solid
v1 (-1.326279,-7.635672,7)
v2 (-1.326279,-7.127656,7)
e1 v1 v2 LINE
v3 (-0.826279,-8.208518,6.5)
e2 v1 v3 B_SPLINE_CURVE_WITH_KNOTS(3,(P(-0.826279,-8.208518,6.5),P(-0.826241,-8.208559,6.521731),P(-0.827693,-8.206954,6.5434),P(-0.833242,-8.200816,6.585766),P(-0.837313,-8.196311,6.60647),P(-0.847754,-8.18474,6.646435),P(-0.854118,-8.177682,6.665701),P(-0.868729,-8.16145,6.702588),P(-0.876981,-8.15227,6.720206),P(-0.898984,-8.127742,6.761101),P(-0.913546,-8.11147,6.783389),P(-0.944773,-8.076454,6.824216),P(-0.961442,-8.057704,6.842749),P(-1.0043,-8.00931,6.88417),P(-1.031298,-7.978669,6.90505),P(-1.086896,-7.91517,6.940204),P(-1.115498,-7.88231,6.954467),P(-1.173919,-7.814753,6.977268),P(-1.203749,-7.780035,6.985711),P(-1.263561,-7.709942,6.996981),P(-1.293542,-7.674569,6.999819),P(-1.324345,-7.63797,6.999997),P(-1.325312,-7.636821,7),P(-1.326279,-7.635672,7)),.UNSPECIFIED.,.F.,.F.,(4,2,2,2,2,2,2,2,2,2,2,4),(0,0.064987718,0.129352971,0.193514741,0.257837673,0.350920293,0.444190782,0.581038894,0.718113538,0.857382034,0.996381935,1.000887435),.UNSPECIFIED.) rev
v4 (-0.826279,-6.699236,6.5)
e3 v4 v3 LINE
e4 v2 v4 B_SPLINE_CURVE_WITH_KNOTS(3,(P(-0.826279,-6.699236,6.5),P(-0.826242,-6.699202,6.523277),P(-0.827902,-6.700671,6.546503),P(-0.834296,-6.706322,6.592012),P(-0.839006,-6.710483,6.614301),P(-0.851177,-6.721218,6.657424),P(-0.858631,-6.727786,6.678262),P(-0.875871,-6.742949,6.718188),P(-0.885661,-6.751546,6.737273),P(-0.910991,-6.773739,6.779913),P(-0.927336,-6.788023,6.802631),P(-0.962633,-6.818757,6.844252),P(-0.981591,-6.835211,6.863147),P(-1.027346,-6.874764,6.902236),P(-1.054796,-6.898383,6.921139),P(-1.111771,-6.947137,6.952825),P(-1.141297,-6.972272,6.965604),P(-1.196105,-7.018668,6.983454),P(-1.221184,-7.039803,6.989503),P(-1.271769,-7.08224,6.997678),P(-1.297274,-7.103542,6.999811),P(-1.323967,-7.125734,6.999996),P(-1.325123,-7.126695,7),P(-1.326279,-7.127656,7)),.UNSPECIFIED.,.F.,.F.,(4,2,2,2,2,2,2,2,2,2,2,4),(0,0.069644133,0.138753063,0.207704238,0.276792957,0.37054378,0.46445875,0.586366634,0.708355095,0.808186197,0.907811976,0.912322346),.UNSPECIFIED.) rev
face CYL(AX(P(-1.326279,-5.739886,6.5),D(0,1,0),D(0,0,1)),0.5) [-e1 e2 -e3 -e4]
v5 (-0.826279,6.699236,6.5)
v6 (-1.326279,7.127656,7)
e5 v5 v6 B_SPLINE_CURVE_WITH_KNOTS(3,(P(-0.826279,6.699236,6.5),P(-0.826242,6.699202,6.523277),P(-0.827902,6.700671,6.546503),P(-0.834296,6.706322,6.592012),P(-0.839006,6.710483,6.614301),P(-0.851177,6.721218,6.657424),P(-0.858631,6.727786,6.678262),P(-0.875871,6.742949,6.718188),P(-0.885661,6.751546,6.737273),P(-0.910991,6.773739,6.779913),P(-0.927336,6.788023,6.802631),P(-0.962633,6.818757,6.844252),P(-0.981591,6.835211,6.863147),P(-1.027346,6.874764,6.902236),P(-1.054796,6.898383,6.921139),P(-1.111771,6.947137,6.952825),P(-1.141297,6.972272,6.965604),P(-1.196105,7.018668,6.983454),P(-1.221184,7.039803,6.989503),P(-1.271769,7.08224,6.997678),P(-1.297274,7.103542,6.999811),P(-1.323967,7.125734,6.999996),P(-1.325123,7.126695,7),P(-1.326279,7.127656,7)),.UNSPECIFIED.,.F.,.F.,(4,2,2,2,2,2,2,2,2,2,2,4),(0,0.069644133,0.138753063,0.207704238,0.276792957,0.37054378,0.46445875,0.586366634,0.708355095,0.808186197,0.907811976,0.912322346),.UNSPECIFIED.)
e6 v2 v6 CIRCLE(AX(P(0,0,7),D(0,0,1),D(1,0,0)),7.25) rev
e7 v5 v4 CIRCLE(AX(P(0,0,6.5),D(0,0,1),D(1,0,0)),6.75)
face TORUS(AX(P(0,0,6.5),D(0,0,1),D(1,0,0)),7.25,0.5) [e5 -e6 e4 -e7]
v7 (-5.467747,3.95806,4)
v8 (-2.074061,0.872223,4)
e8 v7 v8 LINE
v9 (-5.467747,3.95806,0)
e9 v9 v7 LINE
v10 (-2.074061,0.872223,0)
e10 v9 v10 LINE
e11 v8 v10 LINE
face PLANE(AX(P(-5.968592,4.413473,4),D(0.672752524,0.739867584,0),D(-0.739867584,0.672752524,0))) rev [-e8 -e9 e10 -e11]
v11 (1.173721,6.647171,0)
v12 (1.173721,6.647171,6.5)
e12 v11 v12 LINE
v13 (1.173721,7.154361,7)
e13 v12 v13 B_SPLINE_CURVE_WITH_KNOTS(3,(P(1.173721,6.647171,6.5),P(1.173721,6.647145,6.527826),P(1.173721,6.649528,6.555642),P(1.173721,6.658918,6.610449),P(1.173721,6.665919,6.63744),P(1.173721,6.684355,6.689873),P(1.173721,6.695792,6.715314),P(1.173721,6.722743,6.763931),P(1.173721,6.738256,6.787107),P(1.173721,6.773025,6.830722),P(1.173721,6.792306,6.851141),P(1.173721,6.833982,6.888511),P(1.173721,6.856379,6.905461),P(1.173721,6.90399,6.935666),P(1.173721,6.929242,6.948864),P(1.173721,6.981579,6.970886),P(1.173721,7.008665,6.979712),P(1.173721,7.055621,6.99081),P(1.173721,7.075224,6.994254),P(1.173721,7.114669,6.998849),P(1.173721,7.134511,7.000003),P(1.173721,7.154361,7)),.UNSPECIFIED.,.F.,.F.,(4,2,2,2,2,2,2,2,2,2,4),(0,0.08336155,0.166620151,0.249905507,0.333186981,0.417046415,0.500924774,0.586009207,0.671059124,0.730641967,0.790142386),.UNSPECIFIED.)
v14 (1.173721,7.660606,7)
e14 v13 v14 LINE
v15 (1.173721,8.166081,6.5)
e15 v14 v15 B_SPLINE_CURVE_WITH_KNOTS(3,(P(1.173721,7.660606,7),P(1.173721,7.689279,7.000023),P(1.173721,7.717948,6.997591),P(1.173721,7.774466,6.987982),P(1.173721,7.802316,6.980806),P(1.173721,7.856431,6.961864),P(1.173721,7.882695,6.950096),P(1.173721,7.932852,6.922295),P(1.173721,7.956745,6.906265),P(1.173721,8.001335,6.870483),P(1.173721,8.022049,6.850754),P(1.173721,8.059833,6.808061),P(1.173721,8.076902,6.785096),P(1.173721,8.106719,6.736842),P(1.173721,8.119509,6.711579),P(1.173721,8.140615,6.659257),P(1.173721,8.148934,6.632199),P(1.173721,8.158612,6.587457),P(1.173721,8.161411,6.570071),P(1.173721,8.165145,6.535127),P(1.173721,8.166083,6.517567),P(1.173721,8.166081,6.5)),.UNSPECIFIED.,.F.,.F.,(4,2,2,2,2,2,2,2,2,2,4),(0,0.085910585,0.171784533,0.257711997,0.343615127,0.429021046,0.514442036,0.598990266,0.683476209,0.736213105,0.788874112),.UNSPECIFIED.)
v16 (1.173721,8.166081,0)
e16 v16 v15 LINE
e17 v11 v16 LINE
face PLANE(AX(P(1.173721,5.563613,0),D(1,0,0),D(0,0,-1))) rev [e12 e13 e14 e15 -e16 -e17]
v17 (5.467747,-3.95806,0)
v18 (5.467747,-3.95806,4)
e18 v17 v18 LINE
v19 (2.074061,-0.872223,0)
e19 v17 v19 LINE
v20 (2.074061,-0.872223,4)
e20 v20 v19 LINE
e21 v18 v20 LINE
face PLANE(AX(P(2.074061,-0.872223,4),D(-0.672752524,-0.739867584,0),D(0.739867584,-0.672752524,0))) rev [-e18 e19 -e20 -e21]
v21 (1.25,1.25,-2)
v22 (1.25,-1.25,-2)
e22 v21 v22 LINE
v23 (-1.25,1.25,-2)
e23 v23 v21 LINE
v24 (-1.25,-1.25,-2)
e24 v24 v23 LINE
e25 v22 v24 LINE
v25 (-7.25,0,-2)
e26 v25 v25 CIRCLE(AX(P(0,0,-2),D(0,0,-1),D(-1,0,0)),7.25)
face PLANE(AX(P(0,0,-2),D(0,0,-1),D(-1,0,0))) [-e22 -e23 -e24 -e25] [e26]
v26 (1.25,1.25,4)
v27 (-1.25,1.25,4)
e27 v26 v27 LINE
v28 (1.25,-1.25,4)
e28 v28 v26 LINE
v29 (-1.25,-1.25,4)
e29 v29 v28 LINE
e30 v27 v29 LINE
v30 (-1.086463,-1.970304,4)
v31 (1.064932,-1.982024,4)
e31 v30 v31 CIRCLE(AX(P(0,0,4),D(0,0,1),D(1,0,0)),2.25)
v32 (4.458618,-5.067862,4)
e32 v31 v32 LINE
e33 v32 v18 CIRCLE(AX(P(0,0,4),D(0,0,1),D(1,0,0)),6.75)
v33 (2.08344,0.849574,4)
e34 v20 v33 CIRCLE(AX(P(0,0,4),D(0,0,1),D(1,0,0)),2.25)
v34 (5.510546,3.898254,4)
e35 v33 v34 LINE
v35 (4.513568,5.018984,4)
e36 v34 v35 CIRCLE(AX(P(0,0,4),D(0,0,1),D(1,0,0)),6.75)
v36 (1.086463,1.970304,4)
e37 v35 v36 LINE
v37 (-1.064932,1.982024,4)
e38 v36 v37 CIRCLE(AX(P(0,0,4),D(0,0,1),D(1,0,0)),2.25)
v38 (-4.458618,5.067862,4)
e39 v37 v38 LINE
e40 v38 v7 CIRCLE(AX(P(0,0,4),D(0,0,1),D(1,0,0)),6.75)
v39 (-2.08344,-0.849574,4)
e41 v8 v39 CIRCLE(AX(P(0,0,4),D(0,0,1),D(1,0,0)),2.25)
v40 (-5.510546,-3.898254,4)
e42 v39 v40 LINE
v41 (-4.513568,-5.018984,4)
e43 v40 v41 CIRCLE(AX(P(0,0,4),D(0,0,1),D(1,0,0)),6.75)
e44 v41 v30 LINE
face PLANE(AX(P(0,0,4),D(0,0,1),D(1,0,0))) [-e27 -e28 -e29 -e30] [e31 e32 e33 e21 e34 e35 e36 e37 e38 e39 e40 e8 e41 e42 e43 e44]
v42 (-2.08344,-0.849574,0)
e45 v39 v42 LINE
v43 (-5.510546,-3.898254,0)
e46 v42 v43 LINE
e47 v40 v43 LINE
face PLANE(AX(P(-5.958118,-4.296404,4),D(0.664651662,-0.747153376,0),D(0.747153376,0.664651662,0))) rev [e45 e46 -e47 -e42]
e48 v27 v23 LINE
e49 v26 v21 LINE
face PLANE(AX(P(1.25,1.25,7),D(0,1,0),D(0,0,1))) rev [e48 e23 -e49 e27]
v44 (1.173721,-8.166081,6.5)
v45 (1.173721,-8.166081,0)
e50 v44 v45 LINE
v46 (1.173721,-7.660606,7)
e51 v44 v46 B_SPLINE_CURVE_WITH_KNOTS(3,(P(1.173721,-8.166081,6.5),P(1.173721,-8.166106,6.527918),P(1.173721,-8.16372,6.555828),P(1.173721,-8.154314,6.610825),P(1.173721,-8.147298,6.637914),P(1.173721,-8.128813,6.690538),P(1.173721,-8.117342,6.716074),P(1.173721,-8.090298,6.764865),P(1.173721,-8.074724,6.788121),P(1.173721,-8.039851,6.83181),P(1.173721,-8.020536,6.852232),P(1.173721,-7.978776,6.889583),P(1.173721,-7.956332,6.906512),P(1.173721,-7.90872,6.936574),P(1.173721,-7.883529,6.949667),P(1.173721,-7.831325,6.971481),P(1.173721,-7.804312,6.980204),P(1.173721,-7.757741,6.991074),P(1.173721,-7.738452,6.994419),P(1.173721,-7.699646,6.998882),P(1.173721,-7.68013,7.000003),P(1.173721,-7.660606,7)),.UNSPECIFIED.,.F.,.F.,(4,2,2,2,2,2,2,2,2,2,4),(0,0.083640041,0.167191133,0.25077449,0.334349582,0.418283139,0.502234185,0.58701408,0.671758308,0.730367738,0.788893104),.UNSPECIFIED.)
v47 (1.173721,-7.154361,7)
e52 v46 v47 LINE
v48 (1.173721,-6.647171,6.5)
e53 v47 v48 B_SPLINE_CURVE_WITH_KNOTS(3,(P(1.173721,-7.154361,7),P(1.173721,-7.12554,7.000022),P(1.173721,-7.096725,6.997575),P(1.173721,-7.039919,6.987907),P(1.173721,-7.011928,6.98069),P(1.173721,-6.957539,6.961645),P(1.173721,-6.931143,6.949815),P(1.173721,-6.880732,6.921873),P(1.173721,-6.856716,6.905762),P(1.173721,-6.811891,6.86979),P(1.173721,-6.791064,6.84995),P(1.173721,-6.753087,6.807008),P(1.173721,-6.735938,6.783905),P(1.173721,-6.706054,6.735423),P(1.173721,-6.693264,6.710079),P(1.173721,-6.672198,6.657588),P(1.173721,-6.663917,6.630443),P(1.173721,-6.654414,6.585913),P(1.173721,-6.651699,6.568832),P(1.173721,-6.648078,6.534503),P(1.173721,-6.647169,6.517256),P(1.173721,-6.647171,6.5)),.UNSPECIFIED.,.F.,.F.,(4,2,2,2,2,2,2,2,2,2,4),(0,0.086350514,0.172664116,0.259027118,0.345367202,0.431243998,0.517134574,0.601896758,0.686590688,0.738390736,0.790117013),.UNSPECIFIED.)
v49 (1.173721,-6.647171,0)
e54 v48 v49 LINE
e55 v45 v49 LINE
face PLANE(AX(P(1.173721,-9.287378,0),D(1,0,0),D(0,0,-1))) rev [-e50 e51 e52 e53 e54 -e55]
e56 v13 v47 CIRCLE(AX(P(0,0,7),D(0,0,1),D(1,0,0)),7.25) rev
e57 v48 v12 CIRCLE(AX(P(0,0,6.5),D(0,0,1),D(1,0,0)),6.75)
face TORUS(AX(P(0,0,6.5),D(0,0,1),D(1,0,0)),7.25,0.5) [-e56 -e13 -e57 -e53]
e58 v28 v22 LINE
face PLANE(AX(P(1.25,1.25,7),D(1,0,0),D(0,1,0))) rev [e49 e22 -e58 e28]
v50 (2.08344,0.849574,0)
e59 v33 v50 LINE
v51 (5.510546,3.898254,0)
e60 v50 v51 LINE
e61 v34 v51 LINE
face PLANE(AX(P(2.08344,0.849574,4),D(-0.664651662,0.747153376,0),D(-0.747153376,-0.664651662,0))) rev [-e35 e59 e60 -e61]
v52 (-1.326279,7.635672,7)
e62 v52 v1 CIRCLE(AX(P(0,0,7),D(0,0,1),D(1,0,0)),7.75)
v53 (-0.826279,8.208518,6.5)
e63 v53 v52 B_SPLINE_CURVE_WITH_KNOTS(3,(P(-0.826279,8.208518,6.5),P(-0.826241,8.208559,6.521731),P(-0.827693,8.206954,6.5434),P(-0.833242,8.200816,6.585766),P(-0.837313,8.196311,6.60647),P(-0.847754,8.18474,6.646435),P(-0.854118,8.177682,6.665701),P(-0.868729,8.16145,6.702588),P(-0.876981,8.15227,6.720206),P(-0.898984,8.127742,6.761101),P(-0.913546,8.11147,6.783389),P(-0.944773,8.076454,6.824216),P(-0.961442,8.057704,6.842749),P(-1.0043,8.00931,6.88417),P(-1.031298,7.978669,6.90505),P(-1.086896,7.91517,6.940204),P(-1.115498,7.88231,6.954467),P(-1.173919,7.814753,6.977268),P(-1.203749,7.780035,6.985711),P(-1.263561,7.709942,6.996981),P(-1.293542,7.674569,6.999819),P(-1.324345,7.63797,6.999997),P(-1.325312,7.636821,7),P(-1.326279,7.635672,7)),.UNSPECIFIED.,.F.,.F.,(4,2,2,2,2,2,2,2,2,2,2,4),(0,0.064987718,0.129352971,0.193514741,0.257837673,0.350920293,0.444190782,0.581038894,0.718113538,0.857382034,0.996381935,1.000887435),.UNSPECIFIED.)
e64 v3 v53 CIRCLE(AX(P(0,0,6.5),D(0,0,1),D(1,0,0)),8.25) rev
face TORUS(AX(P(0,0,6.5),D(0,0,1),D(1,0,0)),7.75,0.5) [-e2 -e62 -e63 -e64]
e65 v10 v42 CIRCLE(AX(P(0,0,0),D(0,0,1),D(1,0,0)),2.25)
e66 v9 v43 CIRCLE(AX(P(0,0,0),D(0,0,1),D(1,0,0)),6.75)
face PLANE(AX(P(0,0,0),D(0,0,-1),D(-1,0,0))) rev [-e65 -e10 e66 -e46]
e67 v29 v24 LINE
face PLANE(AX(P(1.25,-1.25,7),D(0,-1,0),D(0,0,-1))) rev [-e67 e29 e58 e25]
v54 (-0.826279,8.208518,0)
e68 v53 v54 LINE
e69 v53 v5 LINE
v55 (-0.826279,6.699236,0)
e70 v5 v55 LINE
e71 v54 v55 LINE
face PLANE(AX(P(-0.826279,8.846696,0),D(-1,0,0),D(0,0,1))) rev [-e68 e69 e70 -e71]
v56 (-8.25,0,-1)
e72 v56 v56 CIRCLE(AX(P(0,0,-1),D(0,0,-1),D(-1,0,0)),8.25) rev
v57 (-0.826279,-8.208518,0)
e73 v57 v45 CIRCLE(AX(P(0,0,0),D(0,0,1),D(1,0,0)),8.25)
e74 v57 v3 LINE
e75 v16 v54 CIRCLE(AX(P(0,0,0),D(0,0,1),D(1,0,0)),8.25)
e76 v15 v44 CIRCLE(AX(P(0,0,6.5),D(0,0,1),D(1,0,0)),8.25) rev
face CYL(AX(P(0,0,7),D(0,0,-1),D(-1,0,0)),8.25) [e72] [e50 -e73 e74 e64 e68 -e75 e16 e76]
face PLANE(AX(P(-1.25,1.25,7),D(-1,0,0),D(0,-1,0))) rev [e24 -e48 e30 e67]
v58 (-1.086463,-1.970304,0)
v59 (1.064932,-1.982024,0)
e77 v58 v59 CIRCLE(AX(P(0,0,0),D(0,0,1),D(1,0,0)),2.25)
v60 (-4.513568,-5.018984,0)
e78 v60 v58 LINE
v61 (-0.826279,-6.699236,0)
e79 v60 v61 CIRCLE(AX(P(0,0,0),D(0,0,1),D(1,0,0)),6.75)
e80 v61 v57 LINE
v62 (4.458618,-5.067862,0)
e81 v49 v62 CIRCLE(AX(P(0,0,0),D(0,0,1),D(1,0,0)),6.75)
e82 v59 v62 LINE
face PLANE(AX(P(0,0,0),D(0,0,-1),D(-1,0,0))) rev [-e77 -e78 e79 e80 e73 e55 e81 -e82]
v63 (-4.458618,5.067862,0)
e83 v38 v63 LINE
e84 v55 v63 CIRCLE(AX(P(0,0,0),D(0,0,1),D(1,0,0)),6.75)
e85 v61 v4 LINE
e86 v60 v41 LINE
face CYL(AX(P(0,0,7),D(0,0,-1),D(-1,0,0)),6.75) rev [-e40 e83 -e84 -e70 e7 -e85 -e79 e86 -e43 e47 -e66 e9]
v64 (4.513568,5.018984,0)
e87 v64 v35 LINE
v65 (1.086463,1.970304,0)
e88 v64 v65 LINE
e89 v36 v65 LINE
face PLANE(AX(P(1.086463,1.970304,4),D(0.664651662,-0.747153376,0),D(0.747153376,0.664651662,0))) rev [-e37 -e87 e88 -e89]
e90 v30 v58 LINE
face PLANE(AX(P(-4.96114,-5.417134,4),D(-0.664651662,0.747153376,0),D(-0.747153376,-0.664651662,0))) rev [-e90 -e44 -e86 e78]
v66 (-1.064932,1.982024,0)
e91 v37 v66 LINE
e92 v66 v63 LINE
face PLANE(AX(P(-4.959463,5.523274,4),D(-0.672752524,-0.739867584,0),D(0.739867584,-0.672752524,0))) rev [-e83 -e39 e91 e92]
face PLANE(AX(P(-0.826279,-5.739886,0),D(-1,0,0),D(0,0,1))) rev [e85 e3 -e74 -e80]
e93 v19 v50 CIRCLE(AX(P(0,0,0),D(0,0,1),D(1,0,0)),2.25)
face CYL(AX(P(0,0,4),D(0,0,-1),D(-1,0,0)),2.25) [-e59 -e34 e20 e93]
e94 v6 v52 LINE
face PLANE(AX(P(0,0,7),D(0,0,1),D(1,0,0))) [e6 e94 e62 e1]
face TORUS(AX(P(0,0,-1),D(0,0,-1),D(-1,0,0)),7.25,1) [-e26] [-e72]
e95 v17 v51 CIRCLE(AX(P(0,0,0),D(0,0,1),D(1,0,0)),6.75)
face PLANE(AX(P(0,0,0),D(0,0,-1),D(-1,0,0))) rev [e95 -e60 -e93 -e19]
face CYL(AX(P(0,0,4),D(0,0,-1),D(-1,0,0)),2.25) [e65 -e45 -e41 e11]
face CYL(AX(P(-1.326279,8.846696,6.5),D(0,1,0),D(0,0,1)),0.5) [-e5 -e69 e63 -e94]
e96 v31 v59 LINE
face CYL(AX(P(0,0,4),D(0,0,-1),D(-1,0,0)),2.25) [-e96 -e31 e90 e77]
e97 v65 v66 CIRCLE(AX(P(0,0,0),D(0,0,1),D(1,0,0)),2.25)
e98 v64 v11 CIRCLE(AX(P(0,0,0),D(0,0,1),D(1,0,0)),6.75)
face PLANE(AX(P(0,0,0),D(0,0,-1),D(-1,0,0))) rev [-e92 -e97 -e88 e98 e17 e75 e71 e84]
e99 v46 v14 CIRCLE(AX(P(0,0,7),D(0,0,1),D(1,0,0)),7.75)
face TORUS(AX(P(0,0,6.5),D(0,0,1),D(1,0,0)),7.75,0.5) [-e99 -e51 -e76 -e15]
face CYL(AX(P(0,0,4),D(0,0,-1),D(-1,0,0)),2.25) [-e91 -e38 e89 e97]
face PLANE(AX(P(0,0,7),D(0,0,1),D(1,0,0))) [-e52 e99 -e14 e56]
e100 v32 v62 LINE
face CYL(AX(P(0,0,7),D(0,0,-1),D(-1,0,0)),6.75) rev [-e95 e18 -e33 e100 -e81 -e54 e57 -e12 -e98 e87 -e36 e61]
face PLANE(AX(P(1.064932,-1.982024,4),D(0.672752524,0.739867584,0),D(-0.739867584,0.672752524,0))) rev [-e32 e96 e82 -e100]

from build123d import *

# Parameters (mm, degrees)
SKETCH_1_R          = 8.25
SKETCH_1_R_2        = 6.75
EXTRUDE_1_DEPTH     = 7
EXTRUDE_START       = 2
SKETCH_2_R          = 8.25
EXTRUDE_1_2_DEPTH   = 2
EXTRUDE_3_DEPTH     = 4
SKETCH_3_W          = 2.5
SKETCH_3_H          = 2.5
CUT_EXTRUDE_1_DEPTH = 15.735162028
SKETCH_6_W          = 2
SKETCH_6_H          = 3.283082556
SKETCH_6_H_2        = 3.547491889
CUT_EXTRUDE_2_DEPTH = 7
FILLET_1_R          = 1
FILLET_2_R          = 0.5


with BuildPart() as part:
    # Эскиз1 → Extrude 1 (new body)
    with BuildSketch(Plane.XY):
        Circle(SKETCH_1_R)
        Circle(SKETCH_1_R_2, mode=Mode.SUBTRACT)
    extrude(amount=EXTRUDE_1_DEPTH)

    # Эскиз2 → Extrude 1 2 (add)
    with BuildSketch(Plane(origin=(0, 0, 0), x_dir=(-1, 0, 0), z_dir=(0, 0, -1)).offset(EXTRUDE_START)):
        Circle(SKETCH_2_R)
    extrude(amount=-EXTRUDE_1_2_DEPTH)

    # Эскиз4 → Бобышка-Вытянуть3 (add)
    with BuildSketch(Plane.XY):
        with BuildLine():
            Line((2.07406055, -0.872222927), (5.968591922, -4.413472559))
            Line((5.968591922, -4.413472559), (4.959463137, -5.523273935))
            Line((4.959463137, -5.523273935), (1.064931765, -1.982024303))
            ThreePointArc((1.064931765, -1.982024303), (-0.012257169, -2.249966613), (-1.08646291, -1.970304125))
            Line((-1.08646291, -1.970304125), (-4.961140395, -5.41713434))
            Line((-4.961140395, -5.41713434), (-5.958117889, -4.296404276))
            Line((-5.958117889, -4.296404276), (-2.083440404, -0.849574061))
            ThreePointArc((-2.083440404, -0.849574061), (-2.249966613, 0.012257169), (-2.07406055, 0.872222927))
            Line((-2.07406055, 0.872222927), (-5.968591922, 4.413472559))
            Line((-5.968591922, 4.413472559), (-4.959463137, 5.523273935))
            Line((-4.959463137, 5.523273935), (-1.064931765, 1.982024303))
            ThreePointArc((-1.064931765, 1.982024303), (0.012257169, 2.249966613), (1.08646291, 1.970304125))
            Line((1.08646291, 1.970304125), (4.961140395, 5.41713434))
            Line((4.961140395, 5.41713434), (5.958117889, 4.296404276))
            Line((5.958117889, 4.296404276), (2.083440404, 0.849574061))
            ThreePointArc((2.083440404, 0.849574061), (2.249966613, -0.012257169), (2.07406055, -0.872222927))
        make_face()
    extrude(amount=EXTRUDE_3_DEPTH)

    # Эскиз3 → Вырез-Вытянуть1 (cut, through all)
    with BuildSketch(Plane(origin=(0, 0, -2), x_dir=(-1, 0, 0), z_dir=(0, 0, -1))):
        Rectangle(SKETCH_3_W, SKETCH_3_H)
    extrude(amount=-CUT_EXTRUDE_1_DEPTH, mode=Mode.SUBTRACT)

    # Эскиз6 → Вырез-Вытянуть2 (cut)
    with BuildSketch(Plane.XY.offset(7)):
        with Locations((0.173720833, 7.205154333)):
            Rectangle(SKETCH_6_W, SKETCH_6_H)
        with Locations((0.173720833, -7.513631889)):
            Rectangle(SKETCH_6_W, SKETCH_6_H_2)
    extrude(amount=-CUT_EXTRUDE_2_DEPTH, mode=Mode.SUBTRACT)

    # Скругление1
    fillet_1_edges = [part.edges().sort_by_distance(p)[0] for p in [
        (8.25, 0, -2),
    ]]
    fillet(fillet_1_edges, radius=FILLET_1_R)

    # Скругление2
    # the kernel refuses this fillet: 0.5 mm, written as the material it takes off along each edge
    with BuildSketch(Plane(origin=(0, 0, 7), x_dir=(1, 0, 0), z_dir=(0, -1, 0))) as fillet_2_piece_1:
        with BuildLine():
            CenterArc((8.25 - FILLET_2_R, -FILLET_2_R), FILLET_2_R, 0, 90)
            Line((8.25, -FILLET_2_R), (8.25, 0))
            Line((8.25, 0), (8.25 - FILLET_2_R, 0))
        make_face()
    revolve(axis=Axis((0, 0, 7), (0, 0, 1)), revolution_arc=90.504884873, mode=Mode.SUBTRACT)
    with BuildSketch(Plane(origin=(0, 0, 7), x_dir=(0.06267760440756695, 0.9980338260328296, 0), z_dir=(0.9980338260328296, -0.06267760440756695, 0))) as fillet_2_piece_2:
        with BuildLine():
            CenterArc((6.75 + FILLET_2_R, -FILLET_2_R), FILLET_2_R, 90, 90)
            Line((6.75 + FILLET_2_R, 0), (6.75, 0))
            Line((6.75, 0), (6.75, -FILLET_2_R))
        make_face()
    revolve(axis=Axis((0, 0, 7), (0, 0, 1)), revolution_arc=187.187035343, mode=Mode.SUBTRACT)
    with BuildSketch(Plane(origin=(0, 0, 7), x_dir=(-0.01064718913448663, 0.9999433170752903, 0), z_dir=(-0.9999433170752903, -0.01064718913448663, 0))) as fillet_2_piece_3:
        with BuildLine():
            CenterArc((6.75 + FILLET_2_R, FILLET_2_R), FILLET_2_R, 180, 90)
            Line((6.75 + FILLET_2_R, 0), (6.75, 0))
            Line((6.75, 0), (6.75, FILLET_2_R))
        make_face()
    revolve(axis=Axis((0, 0, 7), (0, 0, -1)), revolution_arc=181.220101055, mode=Mode.SUBTRACT)
    with BuildSketch(Plane(origin=(-0.826279167, 9.458517694, 7), x_dir=(0, 0, -1), z_dir=(0, -1, 0))) as fillet_2_piece_4:
        with BuildLine():
            CenterArc((FILLET_2_R, -FILLET_2_R), FILLET_2_R, 90, 90)
            Line((0, -FILLET_2_R), (0, 0))
            Line((0, 0), (FILLET_2_R, 0))
        make_face()
    extrude(amount=4.009281713, mode=Mode.SUBTRACT)
    with BuildSketch(Plane(origin=(-0.826279167, -5.449235982, 7), x_dir=(-1, 0, 0), z_dir=(0, -1, 0))) as fillet_2_piece_5:
        with BuildLine():
            CenterArc((FILLET_2_R, FILLET_2_R), FILLET_2_R, 180, 90)
            Line((0, FILLET_2_R), (0, 0))
            Line((0, 0), (FILLET_2_R, 0))
        make_face()
    extrude(amount=4.009281713, mode=Mode.SUBTRACT)
    with BuildSketch(Plane(origin=(0, 0, 7), x_dir=(0.05138276513110792, 0.9986790332471597, 0), z_dir=(0.9986790332471597, -0.05138276513110792, 0))) as fillet_2_piece_6:
        with BuildLine():
            CenterArc((8.25 - FILLET_2_R, -FILLET_2_R), FILLET_2_R, 0, 90)
            Line((8.25 - FILLET_2_R, 0), (8.25, 0))
            Line((8.25, 0), (8.25, -FILLET_2_R))
        make_face()
    revolve(axis=Axis((0, 0, 7), (0, 0, 1)), revolution_arc=185.890625165, mode=Mode.SUBTRACT)
    with BuildSketch(Plane(origin=(0, 0, 7), x_dir=(-0.008811789331912054, -0.9999611754307114, 0), z_dir=(-0.9999611754307114, 0.008811789331912054, 0))) as fillet_2_piece_7:
        with BuildLine():
            CenterArc((8.25 - FILLET_2_R, -FILLET_2_R), FILLET_2_R, 0, 90)
            Line((8.25 - FILLET_2_R, 0), (8.25, 0))
            Line((8.25, 0), (8.25, -FILLET_2_R))
        make_face()
    revolve(axis=Axis((0, 0, 7), (0, 0, 1)), revolution_arc=90.504884873, mode=Mode.SUBTRACT)


solid = part.part
